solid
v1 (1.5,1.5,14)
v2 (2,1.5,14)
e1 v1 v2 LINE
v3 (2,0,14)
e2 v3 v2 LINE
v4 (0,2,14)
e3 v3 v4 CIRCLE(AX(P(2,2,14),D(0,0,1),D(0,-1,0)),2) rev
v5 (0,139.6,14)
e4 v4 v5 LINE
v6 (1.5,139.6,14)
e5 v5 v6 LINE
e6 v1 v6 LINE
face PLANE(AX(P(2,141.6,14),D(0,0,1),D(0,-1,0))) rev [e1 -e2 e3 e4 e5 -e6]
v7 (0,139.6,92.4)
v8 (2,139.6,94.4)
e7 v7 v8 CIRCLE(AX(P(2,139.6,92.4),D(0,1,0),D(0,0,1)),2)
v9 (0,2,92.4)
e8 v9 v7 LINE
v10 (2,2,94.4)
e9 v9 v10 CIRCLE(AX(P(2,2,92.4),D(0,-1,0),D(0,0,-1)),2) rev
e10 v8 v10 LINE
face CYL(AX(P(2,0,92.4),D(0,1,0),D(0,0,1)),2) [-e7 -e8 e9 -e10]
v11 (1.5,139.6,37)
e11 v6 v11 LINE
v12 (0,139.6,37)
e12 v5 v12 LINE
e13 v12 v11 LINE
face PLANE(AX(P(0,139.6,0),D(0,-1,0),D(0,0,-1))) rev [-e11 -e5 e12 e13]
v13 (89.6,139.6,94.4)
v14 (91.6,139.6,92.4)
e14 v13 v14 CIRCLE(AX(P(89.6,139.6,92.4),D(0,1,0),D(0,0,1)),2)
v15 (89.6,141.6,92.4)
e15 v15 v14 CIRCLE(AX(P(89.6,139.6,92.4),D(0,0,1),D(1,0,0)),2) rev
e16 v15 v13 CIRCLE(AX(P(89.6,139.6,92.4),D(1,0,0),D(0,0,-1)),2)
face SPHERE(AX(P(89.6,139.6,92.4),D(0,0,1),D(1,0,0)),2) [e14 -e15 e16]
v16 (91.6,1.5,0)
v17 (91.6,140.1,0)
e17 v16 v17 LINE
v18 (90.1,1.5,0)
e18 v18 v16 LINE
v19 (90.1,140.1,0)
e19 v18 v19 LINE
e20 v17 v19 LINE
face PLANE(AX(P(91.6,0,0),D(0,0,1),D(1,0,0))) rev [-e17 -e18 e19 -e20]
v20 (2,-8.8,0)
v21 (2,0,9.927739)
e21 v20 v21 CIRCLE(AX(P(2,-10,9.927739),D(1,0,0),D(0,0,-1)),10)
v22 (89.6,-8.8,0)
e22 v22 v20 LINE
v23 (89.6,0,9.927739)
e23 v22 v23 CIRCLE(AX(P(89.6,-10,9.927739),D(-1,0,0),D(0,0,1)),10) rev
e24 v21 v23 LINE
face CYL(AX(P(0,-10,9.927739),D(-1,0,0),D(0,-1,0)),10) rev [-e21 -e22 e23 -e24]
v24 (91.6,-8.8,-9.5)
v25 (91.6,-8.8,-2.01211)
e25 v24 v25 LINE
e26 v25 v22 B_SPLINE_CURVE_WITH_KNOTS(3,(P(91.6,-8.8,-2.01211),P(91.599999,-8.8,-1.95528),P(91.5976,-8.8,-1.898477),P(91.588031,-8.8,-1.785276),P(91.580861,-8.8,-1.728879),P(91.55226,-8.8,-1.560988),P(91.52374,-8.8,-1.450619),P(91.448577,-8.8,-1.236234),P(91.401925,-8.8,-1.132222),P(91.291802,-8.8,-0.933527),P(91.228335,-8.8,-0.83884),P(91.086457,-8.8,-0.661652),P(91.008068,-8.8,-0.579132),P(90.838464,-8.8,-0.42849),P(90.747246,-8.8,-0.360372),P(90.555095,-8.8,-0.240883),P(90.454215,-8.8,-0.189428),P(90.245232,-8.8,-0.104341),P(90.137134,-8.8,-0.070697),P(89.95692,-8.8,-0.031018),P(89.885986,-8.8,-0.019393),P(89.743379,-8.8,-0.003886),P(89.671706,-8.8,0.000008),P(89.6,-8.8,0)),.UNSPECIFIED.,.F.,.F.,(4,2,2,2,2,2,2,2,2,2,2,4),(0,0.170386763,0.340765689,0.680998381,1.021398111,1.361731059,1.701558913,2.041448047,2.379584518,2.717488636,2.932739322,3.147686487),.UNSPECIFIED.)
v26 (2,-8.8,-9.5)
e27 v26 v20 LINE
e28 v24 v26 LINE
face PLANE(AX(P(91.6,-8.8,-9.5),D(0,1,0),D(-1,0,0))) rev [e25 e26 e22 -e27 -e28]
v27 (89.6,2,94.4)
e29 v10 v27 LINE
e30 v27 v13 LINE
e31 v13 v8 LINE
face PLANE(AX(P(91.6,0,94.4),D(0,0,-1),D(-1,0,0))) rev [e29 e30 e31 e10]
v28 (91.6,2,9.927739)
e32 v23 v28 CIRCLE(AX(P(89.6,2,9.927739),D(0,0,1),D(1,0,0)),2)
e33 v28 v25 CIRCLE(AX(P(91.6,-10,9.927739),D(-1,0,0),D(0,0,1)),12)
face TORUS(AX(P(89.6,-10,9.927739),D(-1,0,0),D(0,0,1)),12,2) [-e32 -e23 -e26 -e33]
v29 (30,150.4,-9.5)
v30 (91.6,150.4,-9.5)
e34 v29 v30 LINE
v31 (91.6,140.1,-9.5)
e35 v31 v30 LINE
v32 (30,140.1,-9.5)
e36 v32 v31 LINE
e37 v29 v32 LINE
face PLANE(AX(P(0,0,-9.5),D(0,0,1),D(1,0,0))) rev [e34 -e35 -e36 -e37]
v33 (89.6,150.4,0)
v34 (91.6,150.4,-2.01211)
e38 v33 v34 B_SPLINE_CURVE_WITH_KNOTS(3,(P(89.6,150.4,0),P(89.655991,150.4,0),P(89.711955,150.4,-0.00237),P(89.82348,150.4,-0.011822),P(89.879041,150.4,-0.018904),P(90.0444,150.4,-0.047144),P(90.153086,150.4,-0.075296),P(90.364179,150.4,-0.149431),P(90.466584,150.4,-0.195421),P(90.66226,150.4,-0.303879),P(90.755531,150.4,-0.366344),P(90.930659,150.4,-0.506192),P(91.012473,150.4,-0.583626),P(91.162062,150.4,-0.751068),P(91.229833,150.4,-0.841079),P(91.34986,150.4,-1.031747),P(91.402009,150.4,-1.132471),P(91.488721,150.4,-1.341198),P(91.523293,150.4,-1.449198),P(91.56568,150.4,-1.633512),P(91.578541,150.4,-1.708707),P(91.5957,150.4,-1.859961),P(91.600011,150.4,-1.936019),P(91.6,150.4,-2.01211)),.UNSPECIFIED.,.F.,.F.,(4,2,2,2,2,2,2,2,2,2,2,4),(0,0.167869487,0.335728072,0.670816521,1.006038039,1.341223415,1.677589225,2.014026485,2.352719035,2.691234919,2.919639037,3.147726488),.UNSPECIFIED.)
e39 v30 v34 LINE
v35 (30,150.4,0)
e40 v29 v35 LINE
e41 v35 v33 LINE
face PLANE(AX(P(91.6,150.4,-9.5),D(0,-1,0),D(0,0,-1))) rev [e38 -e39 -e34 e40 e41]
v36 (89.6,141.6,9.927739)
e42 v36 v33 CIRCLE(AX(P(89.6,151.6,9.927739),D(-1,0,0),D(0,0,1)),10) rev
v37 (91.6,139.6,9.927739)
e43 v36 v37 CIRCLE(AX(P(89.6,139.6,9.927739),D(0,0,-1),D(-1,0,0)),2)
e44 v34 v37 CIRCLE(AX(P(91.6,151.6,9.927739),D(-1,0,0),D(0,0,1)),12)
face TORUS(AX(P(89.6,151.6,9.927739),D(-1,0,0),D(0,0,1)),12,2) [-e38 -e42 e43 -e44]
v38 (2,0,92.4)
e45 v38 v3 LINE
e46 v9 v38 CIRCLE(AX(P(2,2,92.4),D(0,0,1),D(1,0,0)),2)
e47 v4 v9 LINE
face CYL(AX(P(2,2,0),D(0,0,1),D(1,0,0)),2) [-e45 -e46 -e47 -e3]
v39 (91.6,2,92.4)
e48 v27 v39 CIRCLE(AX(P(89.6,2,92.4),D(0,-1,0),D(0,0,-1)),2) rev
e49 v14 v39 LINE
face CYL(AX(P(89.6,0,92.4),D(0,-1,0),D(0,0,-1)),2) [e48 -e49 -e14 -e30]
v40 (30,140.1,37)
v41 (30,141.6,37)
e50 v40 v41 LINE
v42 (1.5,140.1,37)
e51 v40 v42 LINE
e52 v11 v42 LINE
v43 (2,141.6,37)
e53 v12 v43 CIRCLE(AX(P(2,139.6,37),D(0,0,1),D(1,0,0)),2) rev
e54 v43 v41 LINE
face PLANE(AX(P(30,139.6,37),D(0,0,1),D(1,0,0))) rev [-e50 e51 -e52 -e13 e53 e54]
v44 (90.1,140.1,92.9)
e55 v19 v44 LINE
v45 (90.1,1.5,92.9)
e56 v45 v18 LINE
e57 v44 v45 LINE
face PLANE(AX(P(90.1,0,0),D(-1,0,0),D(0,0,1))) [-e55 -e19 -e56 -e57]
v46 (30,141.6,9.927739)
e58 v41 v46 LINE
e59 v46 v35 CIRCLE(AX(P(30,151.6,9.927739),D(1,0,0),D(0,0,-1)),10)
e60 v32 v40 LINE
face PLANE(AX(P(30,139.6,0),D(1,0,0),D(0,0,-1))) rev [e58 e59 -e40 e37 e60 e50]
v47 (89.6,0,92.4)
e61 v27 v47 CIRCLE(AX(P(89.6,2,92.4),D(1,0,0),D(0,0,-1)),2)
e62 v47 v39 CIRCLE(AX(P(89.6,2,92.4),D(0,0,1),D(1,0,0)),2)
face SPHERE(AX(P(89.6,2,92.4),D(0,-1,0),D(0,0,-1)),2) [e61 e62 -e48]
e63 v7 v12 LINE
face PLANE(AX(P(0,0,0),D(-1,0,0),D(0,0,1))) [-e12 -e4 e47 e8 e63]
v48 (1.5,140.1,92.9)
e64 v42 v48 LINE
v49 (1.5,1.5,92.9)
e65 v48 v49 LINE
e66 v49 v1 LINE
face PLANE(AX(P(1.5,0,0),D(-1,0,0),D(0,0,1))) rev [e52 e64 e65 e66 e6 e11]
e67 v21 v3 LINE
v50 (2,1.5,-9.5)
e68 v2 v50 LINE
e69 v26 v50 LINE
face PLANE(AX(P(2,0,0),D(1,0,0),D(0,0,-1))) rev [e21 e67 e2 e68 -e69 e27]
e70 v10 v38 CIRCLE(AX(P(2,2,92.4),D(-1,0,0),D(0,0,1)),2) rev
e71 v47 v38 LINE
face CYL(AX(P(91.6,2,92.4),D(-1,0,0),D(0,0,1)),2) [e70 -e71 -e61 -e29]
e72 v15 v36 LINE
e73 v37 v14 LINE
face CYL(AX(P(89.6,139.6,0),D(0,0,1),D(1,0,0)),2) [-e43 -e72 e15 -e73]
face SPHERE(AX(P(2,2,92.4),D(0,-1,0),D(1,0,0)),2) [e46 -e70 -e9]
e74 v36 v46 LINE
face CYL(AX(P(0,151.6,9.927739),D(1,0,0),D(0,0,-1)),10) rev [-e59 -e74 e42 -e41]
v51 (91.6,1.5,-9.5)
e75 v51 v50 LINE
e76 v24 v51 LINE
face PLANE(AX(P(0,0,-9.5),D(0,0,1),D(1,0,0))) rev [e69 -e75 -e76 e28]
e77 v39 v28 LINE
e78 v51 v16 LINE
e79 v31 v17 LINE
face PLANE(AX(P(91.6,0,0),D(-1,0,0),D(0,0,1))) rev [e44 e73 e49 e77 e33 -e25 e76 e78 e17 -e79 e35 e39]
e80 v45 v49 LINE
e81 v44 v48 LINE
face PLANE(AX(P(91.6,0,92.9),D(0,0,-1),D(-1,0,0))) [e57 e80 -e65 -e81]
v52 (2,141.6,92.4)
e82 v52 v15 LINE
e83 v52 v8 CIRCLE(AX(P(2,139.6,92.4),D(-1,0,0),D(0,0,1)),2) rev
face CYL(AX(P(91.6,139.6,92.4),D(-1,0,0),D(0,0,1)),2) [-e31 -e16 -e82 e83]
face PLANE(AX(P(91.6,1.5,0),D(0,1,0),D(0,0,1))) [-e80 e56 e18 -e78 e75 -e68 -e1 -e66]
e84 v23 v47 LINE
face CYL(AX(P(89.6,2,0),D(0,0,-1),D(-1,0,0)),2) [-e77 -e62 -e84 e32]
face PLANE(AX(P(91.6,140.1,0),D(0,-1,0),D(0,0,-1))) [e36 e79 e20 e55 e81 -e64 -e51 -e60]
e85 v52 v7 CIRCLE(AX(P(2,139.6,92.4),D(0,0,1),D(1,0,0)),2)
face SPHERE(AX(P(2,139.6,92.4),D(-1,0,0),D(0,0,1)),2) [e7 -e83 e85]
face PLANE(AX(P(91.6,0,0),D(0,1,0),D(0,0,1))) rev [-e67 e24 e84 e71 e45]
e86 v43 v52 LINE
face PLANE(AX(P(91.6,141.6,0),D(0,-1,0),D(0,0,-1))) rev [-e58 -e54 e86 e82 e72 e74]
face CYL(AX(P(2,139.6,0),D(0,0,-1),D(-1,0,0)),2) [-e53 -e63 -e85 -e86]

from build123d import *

# Parameters (mm, degrees)
SKETCH1_W             = 141.6
SKETCH1_H             = 94.4
BOSS_EXTRUDE1_DEPTH   = 91.6
SHELL1_T              = -1.5
SKETCH2_W             = 141.6
SKETCH2_H             = 14
CUT_EXTRUDE1_DEPTH    = 2
SKETCH3_W             = 30
SKETCH3_H             = 37
CUT_EXTRUDE2_DEPTH    = 2
SKETCH4_W             = 91.6
SKETCH4_H             = 8.8
BOSS_EXTRUDE2_DEPTH   = 9.5
SKETCH4_W_2           = 61.6
BOSS_EXTRUDE2_2_DEPTH = 9.5
SKETCH5_W             = 91.6
SKETCH5_H             = 1.5
SKETCH5_W_2           = 61.6
BOSS_EXTRUDE3_DEPTH   = 9.5
FILLET1_R             = 10
SKETCH6_W             = 2
SKETCH6_H             = 10.3
CUT_EXTRUDE3_DEPTH    = 200.80510504
FILLET2_R             = 2


with BuildPart() as part:
    # Sketch1 → Boss-Extrude1 (new body)
    with BuildSketch(Plane.YZ):
        with Locations((70.8, 47.2)):
            Rectangle(SKETCH1_W, SKETCH1_H)
    extrude(amount=BOSS_EXTRUDE1_DEPTH)

    # Shell1
    shell1_openings = [part.faces().sort_by_distance(p)[0] for p in [
        (45.8, 70.8, 0),
    ]]
    offset(amount=SHELL1_T, openings=shell1_openings, kind=Kind.INTERSECTION)

    # Sketch2 → Cut-Extrude1 (cut)
    with BuildSketch(Plane(origin=(0, 0, 0), x_dir=(0, -1, 0), z_dir=(-1, 0, 0))):
        with Locations((-70.8, 7)):
            Rectangle(SKETCH2_W, SKETCH2_H)
    extrude(amount=-CUT_EXTRUDE1_DEPTH, mode=Mode.SUBTRACT)

    # Sketch3 → Cut-Extrude2 (cut)
    with BuildSketch(Plane(origin=(0, 141.6, 0), x_dir=(1, 0, 0), z_dir=(0, 1, 0))):
        with Locations((15, -18.5)):
            Rectangle(SKETCH3_W, SKETCH3_H)
    extrude(amount=-CUT_EXTRUDE2_DEPTH, mode=Mode.SUBTRACT)



with BuildPart() as body_2:
    # Sketch4 → Boss-Extrude2 (new body)
    with BuildSketch(Plane(origin=(0, 0, 0), x_dir=(1, 0, 0), z_dir=(0, 0, -1))):
        with Locations((45.8, 4.4)):
            Rectangle(SKETCH4_W, SKETCH4_H)
    extrude(amount=BOSS_EXTRUDE2_DEPTH)


with BuildPart() as body_3:
    # Sketch4 → Boss-Extrude2 2 (new body)
    with BuildSketch(Plane(origin=(0, 0, 0), x_dir=(1, 0, 0), z_dir=(0, 0, -1))):
        with Locations((60.8, -146)):
            Rectangle(SKETCH4_W_2, SKETCH4_H)
    extrude(amount=BOSS_EXTRUDE2_2_DEPTH)


with BuildPart() as part_1:
    add(part.part)

    add(body_2.part)  # Boss-Extrude3 merges body 2

    add(body_3.part)  # Boss-Extrude3 merges body 3
    # Sketch5 → Boss-Extrude3 (add)
    with BuildSketch(Plane(origin=(0, 0, 0), x_dir=(1, 0, 0), z_dir=(0, 0, -1))):
        with Locations((45.8, -0.75)):
            Rectangle(SKETCH5_W, SKETCH5_H)
        with Locations((60.8, -140.85)):
            Rectangle(SKETCH5_W_2, SKETCH5_H)
    extrude(amount=BOSS_EXTRUDE3_DEPTH)

    # Fillet1
    # the kernel refuses this fillet: 10 mm, written as the material it adds along each edge
    with BuildSketch(Plane(origin=(91.6, 0, 0), x_dir=(0, 0, 1), z_dir=(-1, 0, 0))) as fillet1_piece_1:
        with BuildLine():
            CenterArc((9.927738917, -10), FILLET1_R, 90, 83.107897421)
            Line((0, -8.8), (-0.198554778, -8.776))
            ThreePointArc((-0.198554778, -8.776), (-0.2, -4.4), (-0.2, 0))
            Line((-0.2, 0), (0, 0.2))
            Line((0, 0.2), (9.927738917, 0.2))
            Line((9.927738917, 0.2), (9.927738917, 0))
        make_face()
    extrude(amount=89.6)
    with BuildSketch(Plane(origin=(91.6, 141.6, 0), x_dir=(0, 0, 1), z_dir=(-1, 0, 0))) as fillet1_piece_2:
        with BuildLine():
            CenterArc((9.927738917, 10), FILLET1_R, 186.892102579, 83.107897421)
            Line((0, 8.8), (-0.198554778, 8.776))
            ThreePointArc((-0.198554778, 8.776), (-0.2, 4.4), (-0.2, 0))
            Line((-0.2, 0), (0, -0.2))
            Line((0, -0.2), (9.927738917, -0.2))
            Line((9.927738917, -0.2), (9.927738917, 0))
        make_face()
    extrude(amount=61.6)

    # Sketch6 → Cut-Extrude3 (cut, through all)
    with BuildSketch(Plane.XY):
        with Locations((1, -3.65)):
            Rectangle(SKETCH6_W, SKETCH6_H)
    extrude(amount=-CUT_EXTRUDE3_DEPTH, mode=Mode.SUBTRACT)

    # Fillet2
    fillet2_edges = [part_1.edges().sort_by_distance(p)[0] for p in [
        (91.6, 144.116685226, 3.294489336),
        (91.6, -2.516685226, 3.294489336),
        (0, 0, 54.2),
        (0, 141.6, 65.7),
        (91.6, 141.6, 52.163869458),
        (91.6, 0, 52.163869458),
        (0, 70.8, 94.4),
        (45.8, 0, 94.4),
        (91.6, 70.8, 94.4),
        (45.8, 141.6, 94.4),
    ]]
    fillet(fillet2_edges, radius=FILLET2_R)


solid = part_1.part
